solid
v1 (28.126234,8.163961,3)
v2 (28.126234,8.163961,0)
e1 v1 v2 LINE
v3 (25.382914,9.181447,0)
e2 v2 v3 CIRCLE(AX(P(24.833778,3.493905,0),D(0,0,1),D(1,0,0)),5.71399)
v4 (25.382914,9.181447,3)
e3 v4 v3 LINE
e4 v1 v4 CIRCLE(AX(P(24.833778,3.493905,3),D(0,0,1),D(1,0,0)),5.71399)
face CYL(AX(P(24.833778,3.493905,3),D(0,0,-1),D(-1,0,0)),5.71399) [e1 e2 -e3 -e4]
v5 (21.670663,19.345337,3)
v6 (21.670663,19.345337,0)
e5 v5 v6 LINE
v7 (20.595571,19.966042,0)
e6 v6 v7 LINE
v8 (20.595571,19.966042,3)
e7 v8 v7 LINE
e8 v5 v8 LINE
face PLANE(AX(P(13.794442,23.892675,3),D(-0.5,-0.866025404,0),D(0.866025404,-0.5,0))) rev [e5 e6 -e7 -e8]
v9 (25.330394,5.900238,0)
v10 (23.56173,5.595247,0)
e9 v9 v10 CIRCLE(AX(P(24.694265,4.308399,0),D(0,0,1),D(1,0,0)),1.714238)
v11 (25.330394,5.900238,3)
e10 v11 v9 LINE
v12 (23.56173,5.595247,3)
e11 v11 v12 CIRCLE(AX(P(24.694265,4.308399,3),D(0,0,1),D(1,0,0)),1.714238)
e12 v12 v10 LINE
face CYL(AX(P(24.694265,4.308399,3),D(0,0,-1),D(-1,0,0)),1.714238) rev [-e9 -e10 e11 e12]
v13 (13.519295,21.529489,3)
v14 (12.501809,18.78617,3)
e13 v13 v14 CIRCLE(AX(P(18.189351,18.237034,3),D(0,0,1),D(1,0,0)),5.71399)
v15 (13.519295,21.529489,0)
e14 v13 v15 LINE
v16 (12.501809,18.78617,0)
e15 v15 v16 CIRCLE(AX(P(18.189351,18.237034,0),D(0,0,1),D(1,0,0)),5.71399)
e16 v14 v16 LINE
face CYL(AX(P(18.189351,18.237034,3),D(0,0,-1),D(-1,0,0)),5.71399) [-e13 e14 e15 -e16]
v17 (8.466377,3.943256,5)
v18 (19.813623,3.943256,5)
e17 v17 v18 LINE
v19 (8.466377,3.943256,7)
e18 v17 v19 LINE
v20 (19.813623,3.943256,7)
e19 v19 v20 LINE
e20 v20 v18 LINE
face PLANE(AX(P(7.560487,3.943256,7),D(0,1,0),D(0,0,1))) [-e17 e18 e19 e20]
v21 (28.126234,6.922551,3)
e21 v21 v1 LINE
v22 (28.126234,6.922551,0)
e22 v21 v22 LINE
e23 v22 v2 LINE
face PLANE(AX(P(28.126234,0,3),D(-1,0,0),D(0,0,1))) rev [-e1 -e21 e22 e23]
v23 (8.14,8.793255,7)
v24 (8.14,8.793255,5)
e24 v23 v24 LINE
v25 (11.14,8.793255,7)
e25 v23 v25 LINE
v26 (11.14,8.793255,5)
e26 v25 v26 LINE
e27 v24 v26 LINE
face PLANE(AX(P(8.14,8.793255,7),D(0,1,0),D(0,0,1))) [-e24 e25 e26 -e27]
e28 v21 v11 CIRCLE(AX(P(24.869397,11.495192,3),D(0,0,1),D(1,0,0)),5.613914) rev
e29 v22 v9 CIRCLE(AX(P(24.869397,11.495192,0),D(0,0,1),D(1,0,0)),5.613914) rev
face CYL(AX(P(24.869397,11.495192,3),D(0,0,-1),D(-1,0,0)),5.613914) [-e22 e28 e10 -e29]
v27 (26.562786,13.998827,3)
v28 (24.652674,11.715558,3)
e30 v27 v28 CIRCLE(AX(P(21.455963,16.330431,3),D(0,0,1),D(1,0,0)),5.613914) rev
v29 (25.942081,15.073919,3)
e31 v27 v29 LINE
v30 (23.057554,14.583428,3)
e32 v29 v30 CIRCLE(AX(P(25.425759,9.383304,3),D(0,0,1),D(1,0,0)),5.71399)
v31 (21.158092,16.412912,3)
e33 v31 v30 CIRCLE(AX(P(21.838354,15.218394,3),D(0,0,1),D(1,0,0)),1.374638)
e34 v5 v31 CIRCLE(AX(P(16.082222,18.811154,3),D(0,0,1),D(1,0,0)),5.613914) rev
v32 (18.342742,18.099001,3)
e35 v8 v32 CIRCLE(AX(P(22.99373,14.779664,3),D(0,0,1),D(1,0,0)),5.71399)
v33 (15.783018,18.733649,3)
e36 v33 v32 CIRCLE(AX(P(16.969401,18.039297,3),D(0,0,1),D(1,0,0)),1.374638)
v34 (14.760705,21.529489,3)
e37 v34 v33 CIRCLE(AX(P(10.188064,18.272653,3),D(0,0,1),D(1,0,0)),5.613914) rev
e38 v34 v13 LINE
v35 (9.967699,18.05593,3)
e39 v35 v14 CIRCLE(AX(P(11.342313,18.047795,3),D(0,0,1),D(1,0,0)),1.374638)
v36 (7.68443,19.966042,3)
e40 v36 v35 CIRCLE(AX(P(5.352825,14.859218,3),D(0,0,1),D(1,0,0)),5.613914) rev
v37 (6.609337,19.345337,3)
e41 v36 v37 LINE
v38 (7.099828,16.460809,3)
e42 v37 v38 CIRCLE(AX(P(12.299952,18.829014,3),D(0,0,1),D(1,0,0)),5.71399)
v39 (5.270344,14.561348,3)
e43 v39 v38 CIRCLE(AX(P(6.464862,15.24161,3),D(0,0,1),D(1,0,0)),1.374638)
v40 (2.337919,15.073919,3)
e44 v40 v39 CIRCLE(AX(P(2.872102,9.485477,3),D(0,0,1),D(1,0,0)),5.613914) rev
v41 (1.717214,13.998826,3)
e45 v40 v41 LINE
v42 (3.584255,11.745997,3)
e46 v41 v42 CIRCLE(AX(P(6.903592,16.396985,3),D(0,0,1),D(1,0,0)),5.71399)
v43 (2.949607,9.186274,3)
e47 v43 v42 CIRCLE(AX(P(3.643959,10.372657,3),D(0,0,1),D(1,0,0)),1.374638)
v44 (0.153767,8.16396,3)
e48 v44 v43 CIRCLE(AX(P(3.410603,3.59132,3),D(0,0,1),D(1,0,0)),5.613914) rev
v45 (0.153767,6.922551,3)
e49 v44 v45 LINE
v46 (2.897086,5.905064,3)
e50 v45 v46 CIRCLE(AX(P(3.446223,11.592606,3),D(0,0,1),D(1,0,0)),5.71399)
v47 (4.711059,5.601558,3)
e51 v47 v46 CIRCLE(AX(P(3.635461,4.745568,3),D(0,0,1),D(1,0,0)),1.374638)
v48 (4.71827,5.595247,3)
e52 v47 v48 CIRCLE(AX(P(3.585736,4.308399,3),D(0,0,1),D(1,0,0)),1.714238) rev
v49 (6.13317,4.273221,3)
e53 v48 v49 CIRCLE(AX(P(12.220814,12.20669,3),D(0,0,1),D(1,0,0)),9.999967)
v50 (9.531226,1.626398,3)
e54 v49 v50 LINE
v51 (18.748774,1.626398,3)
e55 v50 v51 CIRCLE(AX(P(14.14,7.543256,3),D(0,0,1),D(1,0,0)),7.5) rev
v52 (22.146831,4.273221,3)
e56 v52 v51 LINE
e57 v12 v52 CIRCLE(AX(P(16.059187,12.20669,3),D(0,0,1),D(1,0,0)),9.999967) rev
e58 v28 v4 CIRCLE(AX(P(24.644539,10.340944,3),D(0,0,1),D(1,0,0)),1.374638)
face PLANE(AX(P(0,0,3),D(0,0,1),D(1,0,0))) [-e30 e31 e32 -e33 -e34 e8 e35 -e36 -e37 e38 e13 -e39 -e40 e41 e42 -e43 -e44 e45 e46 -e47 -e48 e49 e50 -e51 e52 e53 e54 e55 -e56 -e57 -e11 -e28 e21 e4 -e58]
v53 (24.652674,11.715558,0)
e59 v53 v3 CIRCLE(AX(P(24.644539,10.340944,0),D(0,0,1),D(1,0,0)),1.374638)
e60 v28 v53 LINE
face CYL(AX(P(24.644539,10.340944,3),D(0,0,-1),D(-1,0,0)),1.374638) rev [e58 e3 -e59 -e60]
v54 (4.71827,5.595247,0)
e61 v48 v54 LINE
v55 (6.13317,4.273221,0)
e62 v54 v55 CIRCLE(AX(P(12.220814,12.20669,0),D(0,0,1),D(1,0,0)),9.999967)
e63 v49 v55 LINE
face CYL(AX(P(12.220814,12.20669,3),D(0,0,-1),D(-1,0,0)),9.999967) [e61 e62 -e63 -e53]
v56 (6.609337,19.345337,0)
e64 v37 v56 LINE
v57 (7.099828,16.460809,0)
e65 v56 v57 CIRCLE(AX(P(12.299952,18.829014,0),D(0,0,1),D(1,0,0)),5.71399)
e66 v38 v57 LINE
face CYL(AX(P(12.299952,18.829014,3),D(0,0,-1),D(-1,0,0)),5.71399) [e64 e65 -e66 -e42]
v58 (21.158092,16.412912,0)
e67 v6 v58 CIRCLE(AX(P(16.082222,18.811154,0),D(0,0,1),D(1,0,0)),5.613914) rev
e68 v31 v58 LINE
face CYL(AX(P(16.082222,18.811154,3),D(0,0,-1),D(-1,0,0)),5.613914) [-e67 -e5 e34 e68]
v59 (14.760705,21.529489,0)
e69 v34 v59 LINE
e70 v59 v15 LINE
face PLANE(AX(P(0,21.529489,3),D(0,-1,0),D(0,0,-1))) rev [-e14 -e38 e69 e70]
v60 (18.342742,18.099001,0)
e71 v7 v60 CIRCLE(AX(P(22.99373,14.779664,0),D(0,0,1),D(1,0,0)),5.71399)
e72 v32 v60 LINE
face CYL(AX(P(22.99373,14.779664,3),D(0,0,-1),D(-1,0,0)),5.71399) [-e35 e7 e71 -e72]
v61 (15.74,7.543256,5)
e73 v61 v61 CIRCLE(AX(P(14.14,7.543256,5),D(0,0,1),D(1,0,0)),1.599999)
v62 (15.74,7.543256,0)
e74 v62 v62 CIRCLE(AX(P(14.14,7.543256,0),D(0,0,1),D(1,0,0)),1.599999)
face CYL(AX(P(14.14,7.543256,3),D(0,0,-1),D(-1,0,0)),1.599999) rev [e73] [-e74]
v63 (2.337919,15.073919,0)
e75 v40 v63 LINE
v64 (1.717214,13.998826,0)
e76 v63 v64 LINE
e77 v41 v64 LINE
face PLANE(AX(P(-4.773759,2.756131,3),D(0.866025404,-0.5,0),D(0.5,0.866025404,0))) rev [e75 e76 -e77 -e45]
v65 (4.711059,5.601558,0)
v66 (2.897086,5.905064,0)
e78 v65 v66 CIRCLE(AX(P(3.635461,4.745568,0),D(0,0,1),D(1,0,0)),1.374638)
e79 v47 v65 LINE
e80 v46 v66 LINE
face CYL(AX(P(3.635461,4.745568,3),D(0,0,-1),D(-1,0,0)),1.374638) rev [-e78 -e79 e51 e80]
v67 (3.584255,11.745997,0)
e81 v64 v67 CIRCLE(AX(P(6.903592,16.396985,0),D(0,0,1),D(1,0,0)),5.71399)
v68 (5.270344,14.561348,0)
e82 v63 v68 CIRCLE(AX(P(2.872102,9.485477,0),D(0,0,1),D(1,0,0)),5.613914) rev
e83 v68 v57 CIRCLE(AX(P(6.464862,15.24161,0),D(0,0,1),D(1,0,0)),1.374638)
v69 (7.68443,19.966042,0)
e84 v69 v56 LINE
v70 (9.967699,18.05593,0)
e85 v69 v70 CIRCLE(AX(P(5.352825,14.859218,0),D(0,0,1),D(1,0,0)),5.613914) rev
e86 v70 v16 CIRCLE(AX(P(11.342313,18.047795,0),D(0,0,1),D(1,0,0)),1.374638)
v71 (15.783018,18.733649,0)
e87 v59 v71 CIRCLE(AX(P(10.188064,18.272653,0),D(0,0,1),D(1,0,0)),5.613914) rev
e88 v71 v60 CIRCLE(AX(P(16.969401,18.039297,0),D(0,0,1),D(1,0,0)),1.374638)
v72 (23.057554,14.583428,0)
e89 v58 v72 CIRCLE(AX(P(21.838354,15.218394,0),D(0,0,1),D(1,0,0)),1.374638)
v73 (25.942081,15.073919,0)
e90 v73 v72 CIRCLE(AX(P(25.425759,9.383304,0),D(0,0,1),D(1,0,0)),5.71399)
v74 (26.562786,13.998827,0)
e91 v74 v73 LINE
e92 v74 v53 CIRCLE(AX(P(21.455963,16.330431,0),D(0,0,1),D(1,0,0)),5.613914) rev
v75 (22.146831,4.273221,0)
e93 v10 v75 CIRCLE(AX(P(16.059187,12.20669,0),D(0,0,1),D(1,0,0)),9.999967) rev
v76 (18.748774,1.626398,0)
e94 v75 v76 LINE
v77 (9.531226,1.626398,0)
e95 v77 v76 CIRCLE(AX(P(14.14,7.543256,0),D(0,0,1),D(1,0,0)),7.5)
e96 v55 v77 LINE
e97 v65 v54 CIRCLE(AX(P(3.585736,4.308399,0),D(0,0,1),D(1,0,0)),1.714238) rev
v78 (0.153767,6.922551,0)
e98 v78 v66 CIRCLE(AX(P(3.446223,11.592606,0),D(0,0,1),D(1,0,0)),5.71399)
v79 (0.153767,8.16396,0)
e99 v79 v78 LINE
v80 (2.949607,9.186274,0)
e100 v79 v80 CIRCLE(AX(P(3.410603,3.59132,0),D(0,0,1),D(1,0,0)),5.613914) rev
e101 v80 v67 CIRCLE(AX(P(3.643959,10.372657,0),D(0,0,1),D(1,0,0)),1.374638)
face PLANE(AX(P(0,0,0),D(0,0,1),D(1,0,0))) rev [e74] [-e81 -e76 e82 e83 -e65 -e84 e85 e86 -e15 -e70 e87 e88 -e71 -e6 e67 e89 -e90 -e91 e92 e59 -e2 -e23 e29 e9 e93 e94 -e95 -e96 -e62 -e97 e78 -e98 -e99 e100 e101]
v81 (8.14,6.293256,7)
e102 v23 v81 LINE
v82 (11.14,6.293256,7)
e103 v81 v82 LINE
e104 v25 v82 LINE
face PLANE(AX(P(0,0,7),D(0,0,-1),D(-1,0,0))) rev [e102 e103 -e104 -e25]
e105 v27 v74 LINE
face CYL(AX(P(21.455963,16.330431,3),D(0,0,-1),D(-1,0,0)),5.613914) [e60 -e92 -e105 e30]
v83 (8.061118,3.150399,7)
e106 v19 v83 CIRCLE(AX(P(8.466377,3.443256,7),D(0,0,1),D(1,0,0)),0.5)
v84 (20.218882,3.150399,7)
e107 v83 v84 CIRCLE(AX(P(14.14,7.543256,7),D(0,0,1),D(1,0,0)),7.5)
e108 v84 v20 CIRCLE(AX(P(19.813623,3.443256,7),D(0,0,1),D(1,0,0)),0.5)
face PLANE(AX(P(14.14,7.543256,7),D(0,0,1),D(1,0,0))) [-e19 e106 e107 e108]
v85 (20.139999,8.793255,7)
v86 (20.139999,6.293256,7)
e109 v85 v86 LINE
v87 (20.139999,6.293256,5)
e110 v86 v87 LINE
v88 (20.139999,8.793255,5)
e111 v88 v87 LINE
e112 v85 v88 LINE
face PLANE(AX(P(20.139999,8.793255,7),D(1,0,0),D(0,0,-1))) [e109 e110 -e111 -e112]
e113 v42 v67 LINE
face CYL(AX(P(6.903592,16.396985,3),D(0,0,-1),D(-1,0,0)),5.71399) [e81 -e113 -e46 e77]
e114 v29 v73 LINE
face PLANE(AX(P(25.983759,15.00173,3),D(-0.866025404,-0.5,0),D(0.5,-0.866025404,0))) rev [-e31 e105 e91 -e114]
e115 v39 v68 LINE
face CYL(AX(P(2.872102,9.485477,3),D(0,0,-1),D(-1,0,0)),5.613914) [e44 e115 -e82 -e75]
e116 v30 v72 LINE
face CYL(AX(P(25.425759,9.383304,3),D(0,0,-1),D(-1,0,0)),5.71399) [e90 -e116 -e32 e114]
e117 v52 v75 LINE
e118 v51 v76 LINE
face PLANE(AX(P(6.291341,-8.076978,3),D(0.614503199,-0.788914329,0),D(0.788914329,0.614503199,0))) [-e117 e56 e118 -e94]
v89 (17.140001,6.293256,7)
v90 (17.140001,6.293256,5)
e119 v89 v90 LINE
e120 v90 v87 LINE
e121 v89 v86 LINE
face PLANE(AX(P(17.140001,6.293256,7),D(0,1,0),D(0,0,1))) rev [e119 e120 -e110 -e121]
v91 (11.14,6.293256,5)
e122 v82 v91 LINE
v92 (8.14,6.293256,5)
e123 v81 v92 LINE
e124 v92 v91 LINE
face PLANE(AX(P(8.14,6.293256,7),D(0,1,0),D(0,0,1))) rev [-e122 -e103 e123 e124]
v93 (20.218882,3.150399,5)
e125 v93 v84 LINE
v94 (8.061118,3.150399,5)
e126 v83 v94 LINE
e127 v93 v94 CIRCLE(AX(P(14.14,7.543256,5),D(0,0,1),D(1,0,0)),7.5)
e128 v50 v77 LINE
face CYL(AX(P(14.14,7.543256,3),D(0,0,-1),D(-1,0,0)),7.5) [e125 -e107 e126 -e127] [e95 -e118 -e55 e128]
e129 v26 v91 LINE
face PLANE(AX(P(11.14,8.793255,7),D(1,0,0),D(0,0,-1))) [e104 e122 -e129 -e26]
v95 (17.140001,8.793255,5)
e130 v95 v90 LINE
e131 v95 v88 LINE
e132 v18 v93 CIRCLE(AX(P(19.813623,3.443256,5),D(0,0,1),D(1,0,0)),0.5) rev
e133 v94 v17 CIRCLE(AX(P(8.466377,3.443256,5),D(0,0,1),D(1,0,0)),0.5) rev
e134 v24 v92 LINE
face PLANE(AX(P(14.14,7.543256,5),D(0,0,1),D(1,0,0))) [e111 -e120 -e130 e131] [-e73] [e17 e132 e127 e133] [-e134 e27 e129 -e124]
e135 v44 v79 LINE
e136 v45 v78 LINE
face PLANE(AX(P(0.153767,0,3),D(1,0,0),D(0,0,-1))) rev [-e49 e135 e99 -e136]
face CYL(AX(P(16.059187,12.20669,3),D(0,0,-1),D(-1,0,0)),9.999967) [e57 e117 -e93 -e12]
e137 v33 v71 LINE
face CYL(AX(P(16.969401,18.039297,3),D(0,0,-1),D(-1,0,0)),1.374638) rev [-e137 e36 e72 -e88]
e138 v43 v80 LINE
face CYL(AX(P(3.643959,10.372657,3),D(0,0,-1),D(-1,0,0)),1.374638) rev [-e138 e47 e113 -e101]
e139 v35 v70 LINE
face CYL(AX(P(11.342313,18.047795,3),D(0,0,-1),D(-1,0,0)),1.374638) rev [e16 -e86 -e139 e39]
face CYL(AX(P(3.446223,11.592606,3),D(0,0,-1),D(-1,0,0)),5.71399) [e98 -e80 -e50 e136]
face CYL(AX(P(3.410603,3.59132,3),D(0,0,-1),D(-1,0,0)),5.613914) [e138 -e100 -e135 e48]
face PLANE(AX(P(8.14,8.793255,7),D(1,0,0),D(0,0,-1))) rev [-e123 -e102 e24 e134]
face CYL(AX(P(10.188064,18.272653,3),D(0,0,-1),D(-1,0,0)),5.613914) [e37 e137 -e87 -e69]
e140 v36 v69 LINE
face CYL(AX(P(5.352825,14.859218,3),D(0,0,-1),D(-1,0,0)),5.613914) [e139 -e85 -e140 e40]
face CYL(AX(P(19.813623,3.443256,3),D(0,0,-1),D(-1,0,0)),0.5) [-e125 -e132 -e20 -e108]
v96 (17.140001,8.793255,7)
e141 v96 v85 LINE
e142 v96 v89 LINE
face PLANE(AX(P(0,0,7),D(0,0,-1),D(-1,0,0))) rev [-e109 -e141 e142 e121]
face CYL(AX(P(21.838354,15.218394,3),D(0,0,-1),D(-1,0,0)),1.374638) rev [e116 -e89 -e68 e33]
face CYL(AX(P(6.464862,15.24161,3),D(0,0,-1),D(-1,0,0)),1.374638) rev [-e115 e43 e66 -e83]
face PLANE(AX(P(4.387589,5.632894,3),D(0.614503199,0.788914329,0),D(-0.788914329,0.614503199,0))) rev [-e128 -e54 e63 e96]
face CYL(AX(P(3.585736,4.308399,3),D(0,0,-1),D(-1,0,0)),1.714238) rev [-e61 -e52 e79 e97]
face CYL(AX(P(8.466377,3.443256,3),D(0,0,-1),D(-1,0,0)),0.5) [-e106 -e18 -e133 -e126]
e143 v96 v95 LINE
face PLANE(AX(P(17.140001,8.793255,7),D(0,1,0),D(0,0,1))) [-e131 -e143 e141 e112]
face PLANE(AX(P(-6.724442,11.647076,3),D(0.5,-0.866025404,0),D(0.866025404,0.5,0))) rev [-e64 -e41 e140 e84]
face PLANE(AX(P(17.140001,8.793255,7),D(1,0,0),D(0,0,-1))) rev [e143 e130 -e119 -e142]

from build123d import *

# Parameters (mm, degrees)
SKETCH1_R           = 1.5999994277954093
BOSS_EXTRUDE1_DEPTH = 3
SKETCH2_R           = 7.499999999999997
SKETCH2_R_2         = 1.5999994277954093
BOSS_EXTRUDE2_DEPTH = 2
SKETCH3_W           = 3
SKETCH3_H           = 2.4999990463256836
SKETCH3_W_2         = 2.999998092651367
BOSS_EXTRUDE3_DEPTH = 2
FILLET1_R           = 0.5
FILLET2_R           = 0.5


with BuildPart() as part:
    # Sketch1 → Boss-Extrude1 (new body)
    with BuildSketch(Plane.XY):
        with BuildLine():
            ThreePointArc((2.9496066570281987, 9.186273574829102), (1.4826895125555999, 8.863812001462453), (0.1537669450044632, 8.163960456848145))
            Line((0.1537669450044632, 8.163960456848145), (0.1537669450044632, 6.922550678253174))
            ThreePointArc((0.1537669450044632, 6.922550678253174), (1.4591954710477617, 6.235236889390279), (2.897086284729771, 5.905064375547086))
            ThreePointArc((2.897086284729774, 5.905064375547072), (3.8623065069054006, 6.101359542352135), (4.711058856837534, 5.601558263549775))
            ThreePointArc((4.711058856837534, 5.601558263549774), (4.714668989326369, 5.598407805328139), (4.718270301818848, 5.595247268676758))
            ThreePointArc((4.7182703018188485, 5.595247268676757), (5.393644685511456, 4.899905769989473), (6.133169651031494, 4.273221492767334))
            Line((6.133169651031494, 4.273221492767334), (9.531226350959459, 1.6263983387561165))
            ThreePointArc((9.531226350959457, 1.6263983387561156), (14.140000343322752, 0.04325580596924006), (18.748774335686047, 1.6263983387561183))
            Line((18.748774335686047, 1.62639833875612), (22.14683103561401, 4.273221492767336))
            ThreePointArc((22.14683103561401, 4.273221492767337), (22.886356001134054, 4.899905769989471), (23.56173038482666, 5.595247268676759))
            ThreePointArc((23.56173038482666, 5.595247268676759), (24.402958445676255, 5.997704500562882), (25.330394029617306, 5.900238037109375))
            ThreePointArc((25.330394029617306, 5.900238037109373), (26.79731117408991, 6.222699610476017), (28.12623374164104, 6.922551155090333))
            Line((28.12623374164104, 6.922551155090334), (28.12623374164104, 8.163960933685305))
            ThreePointArc((28.12623374164104, 8.163960933685306), (26.820805215597755, 8.851274722548194), (25.38291440191576, 9.181447236391389))
            ThreePointArc((25.382914401915755, 9.181447236391417), (23.32365030135076, 9.960310627730676), (24.652674438432754, 11.715557522414645))
            ThreePointArc((24.652674438432754, 11.715557522414645), (25.761831164109633, 12.728276008930756), (26.5627860949642, 13.9988265092201))
            Line((26.5627860949642, 13.9988265092201), (25.94208120566671, 15.073918913989761))
            ThreePointArc((25.94208120566671, 15.073918913989761), (24.467890044856905, 15.016435852494713), (23.057553815418423, 14.583428230273288))
            ThreePointArc((23.05755381541841, 14.583428230273306), (20.88474709555818, 14.228311662968322), (21.1580923131719, 16.412912132219382))
            ThreePointArc((21.1580923131719, 16.412912132219382), (21.612290971128385, 17.844530431262903), (21.670663038390177, 19.345336906731784))
            Line((21.670663038390177, 19.345336906731784), (20.595570633620518, 19.966041796029266))
            ThreePointArc((20.595570633620518, 19.966041796029266), (19.347625169072252, 19.179164424082327), (18.34274197761166, 18.099000708487008))
            ThreePointArc((18.34274197761168, 18.099000708486997), (16.638594444351643, 16.70505737996612), (15.78301811218261, 18.733649492263794))
            ThreePointArc((15.783018112182614, 18.73364949226379), (15.460556538815972, 20.20056663673639), (14.760704994201657, 21.529489204287525))
            Line((14.760704994201657, 21.529489204287525), (13.519295215606686, 21.529489204287525))
            ThreePointArc((13.519295215606686, 21.529489204287525), (12.831981426743802, 20.224060678244246), (12.501808912900602, 18.78616986456226))
            ThreePointArc((12.501808912900572, 18.78616986456225), (11.722945521561316, 16.726905763997248), (9.967698626877342, 18.055929901079246))
            ThreePointArc((9.967698626877342, 18.055929901079246), (8.954980140361231, 19.165086626756125), (7.684429640071889, 19.96604155761069))
            Line((7.6844296400718894, 19.96604155761069), (6.609337235302229, 19.345336668313205))
            ThreePointArc((6.609337235302228, 19.345336668313205), (6.666820296797276, 17.8711455075034), (7.099827919018696, 16.460809278064914))
            ThreePointArc((7.099827919018679, 16.4608092780649), (7.454944486323676, 14.288002558204665), (5.270344017072608, 14.561347775818387))
            ThreePointArc((5.270344017072609, 14.561347775818387), (3.8387257180290857, 15.01554643377487), (2.3379192425602042, 15.073918501036662))
            Line((2.3379192425602042, 15.073918501036662), (1.7172143532627213, 13.998826096267006))
            ThreePointArc((1.7172143532627215, 13.998826096267006), (2.504091725209663, 12.750880631718738), (3.584255440804986, 11.745997440258147))
            ThreePointArc((3.584255440804995, 11.745997440258172), (4.978198769325871, 10.04184990699813), (2.9496066570281982, 9.186273574829102))
        make_face()
        with Locations((14.140000343322754, 7.543255805969239)):
            Circle(SKETCH1_R, mode=Mode.SUBTRACT)
    extrude(amount=BOSS_EXTRUDE1_DEPTH)

    # Sketch2 → Boss-Extrude2 (add)
    with BuildSketch(Plane.XY.offset(3)):
        with Locations((14.140000343322754, 7.543255805969239)):
            Circle(SKETCH2_R)
        with Locations((14.140000343322754, 7.543255805969239)):
            Circle(SKETCH2_R_2, mode=Mode.SUBTRACT)
    extrude(amount=BOSS_EXTRUDE2_DEPTH)

    # Sketch3 → Boss-Extrude3 (add)
    with BuildSketch(Plane.XY.offset(5)):
        with Locations((9.640000343322754, 7.54325532913208)):
            Rectangle(SKETCH3_W, SKETCH3_H)
        with Locations((18.640000343322754, 7.54325532913208)):
            Rectangle(SKETCH3_W_2, SKETCH3_H)
        with BuildLine():
            Line((7.560486761755216, 3.943255662918091), (20.71951392489029, 3.943255662918091))
            ThreePointArc((20.71951392489029, 3.943255662918091), (14.140000343322754, 0.04325580596924095), (7.560486761755216, 3.943255662918091))
        make_face()
    extrude(amount=BOSS_EXTRUDE3_DEPTH)

    # Fillet1
    fillet1_edges = [part.edges().sort_by_distance(p)[0] for p in [
        (20.71951392489029, 3.943255662918091, 6),
    ]]
    fillet(fillet1_edges, radius=FILLET1_R)

    # Fillet2
    fillet2_edges = [part.edges().sort_by_distance(p)[0] for p in [
        (7.560486761755216, 3.943255662918091, 6),
    ]]
    fillet(fillet2_edges, radius=FILLET2_R)


solid = part.part
